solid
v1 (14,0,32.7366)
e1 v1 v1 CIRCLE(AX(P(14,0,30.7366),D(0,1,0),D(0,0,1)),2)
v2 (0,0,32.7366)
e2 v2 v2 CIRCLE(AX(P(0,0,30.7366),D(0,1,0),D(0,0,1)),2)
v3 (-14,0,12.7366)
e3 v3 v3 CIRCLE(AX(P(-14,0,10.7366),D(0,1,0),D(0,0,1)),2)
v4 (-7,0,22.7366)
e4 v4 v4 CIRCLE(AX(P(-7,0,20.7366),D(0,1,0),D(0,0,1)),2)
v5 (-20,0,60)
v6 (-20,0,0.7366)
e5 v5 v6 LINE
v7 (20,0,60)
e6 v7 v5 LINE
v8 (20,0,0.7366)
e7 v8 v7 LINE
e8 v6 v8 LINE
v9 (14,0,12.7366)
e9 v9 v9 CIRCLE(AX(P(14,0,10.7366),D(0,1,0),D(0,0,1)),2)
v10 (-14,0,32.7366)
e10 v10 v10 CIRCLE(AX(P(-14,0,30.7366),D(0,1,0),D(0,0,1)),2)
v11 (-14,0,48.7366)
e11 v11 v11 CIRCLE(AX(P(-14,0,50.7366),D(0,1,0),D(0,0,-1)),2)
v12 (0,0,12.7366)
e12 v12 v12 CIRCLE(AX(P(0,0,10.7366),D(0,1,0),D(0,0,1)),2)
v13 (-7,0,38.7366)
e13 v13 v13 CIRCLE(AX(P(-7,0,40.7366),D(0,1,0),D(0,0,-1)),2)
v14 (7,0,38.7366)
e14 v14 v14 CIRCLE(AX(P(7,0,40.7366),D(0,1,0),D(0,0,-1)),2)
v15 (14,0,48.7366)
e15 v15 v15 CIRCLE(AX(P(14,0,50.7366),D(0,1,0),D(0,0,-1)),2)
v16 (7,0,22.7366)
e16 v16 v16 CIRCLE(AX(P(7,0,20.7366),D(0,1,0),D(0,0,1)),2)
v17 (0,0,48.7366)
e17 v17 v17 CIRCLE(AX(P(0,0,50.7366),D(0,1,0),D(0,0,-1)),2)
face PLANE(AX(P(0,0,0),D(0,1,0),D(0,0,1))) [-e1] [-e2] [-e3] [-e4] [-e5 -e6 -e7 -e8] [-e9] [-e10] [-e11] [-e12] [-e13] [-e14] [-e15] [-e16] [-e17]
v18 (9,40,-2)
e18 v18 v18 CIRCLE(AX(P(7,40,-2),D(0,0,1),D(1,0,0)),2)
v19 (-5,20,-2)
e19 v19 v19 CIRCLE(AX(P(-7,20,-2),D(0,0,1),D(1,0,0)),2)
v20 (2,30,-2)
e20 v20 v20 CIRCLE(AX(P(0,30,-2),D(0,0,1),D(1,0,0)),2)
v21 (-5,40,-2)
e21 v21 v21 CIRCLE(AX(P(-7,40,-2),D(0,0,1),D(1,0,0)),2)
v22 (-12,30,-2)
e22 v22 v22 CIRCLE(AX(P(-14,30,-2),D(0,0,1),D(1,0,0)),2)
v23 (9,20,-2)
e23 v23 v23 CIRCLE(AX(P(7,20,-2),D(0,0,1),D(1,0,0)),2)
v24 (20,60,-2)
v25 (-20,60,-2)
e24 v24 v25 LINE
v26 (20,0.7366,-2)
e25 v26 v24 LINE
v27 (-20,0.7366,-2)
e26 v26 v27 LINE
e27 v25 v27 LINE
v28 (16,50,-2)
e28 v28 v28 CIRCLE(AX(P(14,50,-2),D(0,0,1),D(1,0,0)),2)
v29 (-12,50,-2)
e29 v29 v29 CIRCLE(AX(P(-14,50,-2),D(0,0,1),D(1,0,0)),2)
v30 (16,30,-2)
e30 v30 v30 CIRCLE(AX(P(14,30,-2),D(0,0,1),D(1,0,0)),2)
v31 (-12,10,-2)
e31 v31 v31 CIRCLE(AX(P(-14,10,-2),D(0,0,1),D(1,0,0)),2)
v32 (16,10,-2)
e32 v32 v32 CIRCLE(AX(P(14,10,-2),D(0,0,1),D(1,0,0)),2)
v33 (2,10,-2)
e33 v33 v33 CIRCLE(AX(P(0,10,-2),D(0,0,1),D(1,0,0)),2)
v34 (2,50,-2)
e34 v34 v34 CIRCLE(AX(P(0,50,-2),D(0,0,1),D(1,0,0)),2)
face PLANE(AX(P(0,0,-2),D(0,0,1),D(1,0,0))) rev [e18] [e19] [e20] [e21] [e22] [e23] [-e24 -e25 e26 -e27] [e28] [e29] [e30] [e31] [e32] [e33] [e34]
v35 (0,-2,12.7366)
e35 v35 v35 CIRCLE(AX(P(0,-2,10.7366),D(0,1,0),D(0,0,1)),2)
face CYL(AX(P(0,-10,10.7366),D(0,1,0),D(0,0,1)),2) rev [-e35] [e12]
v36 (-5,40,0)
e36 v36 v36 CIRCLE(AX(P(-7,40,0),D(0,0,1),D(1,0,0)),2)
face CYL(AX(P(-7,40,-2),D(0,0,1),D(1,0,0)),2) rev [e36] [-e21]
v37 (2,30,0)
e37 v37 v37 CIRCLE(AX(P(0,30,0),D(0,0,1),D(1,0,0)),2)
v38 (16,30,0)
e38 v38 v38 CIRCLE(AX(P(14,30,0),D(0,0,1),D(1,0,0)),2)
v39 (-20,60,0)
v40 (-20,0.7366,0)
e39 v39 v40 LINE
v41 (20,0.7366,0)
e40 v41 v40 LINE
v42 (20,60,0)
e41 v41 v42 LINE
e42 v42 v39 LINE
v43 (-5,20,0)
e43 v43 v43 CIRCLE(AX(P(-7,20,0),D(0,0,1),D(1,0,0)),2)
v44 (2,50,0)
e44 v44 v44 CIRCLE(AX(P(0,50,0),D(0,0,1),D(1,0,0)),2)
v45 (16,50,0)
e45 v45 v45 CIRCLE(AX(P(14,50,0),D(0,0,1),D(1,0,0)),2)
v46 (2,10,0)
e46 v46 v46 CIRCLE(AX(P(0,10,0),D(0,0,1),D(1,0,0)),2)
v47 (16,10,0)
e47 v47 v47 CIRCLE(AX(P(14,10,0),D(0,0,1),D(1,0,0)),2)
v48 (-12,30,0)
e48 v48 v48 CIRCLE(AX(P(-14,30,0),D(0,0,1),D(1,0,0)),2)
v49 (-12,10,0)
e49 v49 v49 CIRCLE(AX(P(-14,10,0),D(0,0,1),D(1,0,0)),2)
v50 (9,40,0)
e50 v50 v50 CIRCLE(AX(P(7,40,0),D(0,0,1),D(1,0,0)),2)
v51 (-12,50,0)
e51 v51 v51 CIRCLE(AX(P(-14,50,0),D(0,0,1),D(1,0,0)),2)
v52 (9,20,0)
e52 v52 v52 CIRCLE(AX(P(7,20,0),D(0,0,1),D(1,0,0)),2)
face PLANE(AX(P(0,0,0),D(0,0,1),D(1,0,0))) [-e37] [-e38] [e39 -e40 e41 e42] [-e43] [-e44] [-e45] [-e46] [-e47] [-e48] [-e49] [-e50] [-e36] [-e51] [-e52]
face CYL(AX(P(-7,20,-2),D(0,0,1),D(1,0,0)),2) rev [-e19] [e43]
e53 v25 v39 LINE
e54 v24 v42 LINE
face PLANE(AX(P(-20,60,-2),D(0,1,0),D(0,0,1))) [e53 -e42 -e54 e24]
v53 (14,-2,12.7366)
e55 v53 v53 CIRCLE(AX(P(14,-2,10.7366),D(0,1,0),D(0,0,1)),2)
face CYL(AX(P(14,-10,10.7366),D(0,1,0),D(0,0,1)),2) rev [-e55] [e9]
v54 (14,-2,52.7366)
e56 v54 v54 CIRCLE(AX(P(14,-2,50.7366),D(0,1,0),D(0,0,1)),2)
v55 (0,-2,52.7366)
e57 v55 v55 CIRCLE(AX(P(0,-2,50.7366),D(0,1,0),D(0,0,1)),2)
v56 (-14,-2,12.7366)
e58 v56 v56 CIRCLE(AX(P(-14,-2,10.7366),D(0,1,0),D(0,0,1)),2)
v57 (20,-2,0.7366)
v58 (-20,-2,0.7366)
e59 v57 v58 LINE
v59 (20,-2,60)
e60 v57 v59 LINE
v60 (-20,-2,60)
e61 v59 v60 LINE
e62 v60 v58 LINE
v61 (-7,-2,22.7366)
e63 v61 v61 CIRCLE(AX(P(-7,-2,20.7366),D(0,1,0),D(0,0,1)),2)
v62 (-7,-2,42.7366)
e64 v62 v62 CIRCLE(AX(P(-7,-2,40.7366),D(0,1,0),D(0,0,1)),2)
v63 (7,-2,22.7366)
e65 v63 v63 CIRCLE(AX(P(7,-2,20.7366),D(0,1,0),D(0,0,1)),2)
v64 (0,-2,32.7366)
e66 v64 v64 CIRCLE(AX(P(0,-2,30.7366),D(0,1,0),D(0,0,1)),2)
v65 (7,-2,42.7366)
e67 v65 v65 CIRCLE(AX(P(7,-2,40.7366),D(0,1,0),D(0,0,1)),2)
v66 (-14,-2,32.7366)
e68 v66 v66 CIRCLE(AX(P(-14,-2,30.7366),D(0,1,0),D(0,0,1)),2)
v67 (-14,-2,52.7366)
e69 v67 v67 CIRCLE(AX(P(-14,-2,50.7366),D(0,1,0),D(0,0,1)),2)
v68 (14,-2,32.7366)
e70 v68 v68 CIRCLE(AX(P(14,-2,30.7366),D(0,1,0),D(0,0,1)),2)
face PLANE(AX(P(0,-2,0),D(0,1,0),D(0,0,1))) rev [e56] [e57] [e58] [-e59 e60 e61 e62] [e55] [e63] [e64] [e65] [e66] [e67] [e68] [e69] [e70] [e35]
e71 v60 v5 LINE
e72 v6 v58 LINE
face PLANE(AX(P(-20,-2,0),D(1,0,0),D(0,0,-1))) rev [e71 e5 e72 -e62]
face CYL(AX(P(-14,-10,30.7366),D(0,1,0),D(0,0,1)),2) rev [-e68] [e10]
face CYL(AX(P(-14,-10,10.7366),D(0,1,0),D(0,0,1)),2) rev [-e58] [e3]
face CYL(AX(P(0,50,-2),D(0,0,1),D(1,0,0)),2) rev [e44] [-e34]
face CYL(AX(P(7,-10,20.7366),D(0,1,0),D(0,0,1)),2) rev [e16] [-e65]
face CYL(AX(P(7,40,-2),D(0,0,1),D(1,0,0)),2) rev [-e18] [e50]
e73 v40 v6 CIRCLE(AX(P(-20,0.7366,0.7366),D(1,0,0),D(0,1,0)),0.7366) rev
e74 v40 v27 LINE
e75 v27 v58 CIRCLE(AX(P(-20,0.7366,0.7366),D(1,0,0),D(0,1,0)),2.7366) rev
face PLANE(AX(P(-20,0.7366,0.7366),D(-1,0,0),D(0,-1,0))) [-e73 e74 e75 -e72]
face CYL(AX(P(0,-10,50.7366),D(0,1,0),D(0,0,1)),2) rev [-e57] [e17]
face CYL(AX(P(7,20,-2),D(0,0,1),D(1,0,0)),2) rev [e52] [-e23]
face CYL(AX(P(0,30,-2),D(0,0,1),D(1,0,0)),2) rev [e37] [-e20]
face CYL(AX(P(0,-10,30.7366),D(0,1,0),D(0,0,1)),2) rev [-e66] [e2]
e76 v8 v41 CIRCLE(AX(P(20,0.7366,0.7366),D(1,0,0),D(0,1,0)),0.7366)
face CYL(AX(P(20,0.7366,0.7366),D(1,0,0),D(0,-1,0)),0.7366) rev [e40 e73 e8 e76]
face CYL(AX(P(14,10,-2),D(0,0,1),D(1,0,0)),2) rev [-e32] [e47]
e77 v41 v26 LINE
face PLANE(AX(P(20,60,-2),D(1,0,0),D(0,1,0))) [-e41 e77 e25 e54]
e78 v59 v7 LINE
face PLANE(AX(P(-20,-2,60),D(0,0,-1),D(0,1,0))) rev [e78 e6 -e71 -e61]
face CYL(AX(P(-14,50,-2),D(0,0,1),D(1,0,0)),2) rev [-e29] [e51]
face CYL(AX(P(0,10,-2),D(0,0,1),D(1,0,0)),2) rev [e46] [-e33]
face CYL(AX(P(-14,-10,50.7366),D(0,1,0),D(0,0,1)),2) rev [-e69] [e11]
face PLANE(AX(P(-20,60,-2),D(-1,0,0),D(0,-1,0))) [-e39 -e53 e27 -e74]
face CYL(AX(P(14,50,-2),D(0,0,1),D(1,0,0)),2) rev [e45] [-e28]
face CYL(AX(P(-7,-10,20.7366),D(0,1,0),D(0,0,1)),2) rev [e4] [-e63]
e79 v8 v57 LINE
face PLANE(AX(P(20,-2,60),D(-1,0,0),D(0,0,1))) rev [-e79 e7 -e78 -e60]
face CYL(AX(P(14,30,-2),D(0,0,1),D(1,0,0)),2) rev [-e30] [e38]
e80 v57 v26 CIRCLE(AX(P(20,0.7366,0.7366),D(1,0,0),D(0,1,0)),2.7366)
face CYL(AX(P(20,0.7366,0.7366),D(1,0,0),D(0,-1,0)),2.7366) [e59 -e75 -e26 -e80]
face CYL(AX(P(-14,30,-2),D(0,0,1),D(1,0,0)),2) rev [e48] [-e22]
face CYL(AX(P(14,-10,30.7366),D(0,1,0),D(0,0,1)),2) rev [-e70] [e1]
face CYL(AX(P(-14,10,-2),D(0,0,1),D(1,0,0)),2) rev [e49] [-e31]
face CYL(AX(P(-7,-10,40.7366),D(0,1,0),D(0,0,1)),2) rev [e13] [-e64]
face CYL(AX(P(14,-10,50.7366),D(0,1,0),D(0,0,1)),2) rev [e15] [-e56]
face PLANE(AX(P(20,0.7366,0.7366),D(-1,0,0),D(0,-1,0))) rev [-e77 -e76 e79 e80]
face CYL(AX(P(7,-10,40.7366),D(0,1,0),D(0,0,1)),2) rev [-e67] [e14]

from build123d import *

# Parameters (mm, degrees)
SKETCH1_W                    = 40
SKETCH1_H                    = 60
SKETCH1_R                    = 2
BASE_FLANGE1_DEPTH           = 2
EDGE_FLANGE1_STRIP_W         = 9.4732
EDGE_FLANGE1_STRIP_H         = 2
EDGE_FLANGE1_STRIP_CUT_DEPTH = 40
EDGE_FLANGE1_DEPTH           = 40
SKETCH7_R                    = 2
CUT_EXTRUDE1_DEPTH           = 10


# Sheet-metal steps are written as plain solids
with BuildPart() as part:
    # Sketch1 → Base-Flange1 (new body)
    with BuildSketch(Plane.XY):
        with Locations((0, 30)):
            Rectangle(SKETCH1_W, SKETCH1_H)
        with Locations((-14, 50)):
            Circle(SKETCH1_R, mode=Mode.SUBTRACT)
        with Locations((0, 50)):
            Circle(SKETCH1_R, mode=Mode.SUBTRACT)
        with Locations((14, 50)):
            Circle(SKETCH1_R, mode=Mode.SUBTRACT)
        with Locations((-7, 40)):
            Circle(SKETCH1_R, mode=Mode.SUBTRACT)
        with Locations((7, 40)):
            Circle(SKETCH1_R, mode=Mode.SUBTRACT)
        with Locations((-14, 30)):
            Circle(SKETCH1_R, mode=Mode.SUBTRACT)
        with Locations((-7, 20)):
            Circle(SKETCH1_R, mode=Mode.SUBTRACT)
        with Locations((7, 20)):
            Circle(SKETCH1_R, mode=Mode.SUBTRACT)
        with Locations((0, 30)):
            Circle(SKETCH1_R, mode=Mode.SUBTRACT)
        with Locations((14, 30)):
            Circle(SKETCH1_R, mode=Mode.SUBTRACT)
        with Locations((-14, 10)):
            Circle(SKETCH1_R, mode=Mode.SUBTRACT)
        with Locations((0, 10)):
            Circle(SKETCH1_R, mode=Mode.SUBTRACT)
        with Locations((14, 10)):
            Circle(SKETCH1_R, mode=Mode.SUBTRACT)
    extrude(amount=-BASE_FLANGE1_DEPTH)

    # Edge-Flange1 strip (across the edge) → Edge-Flange1 strip cut (cut)
    with BuildSketch(Plane.YZ.offset(-20)):
        with Locations((-4, -1)):
            Rectangle(EDGE_FLANGE1_STRIP_W, EDGE_FLANGE1_STRIP_H)
    extrude(amount=EDGE_FLANGE1_STRIP_CUT_DEPTH, mode=Mode.SUBTRACT)

    # Edge-Flange1 section (across the edge) → Edge-Flange1 (add)
    with BuildSketch(Plane.YZ.offset(-20)):
        with BuildLine():
            Line((-2, 0.7366), (-2, 60))
            Line((-2, 60), (0, 60))
            Line((0, 60), (0, 0.7366))
            ThreePointArc((0, 0.7366), (0.215745145, 0.215745145), (0.7366, 0))
            Line((0.7366, 0), (0.7366, -2))
            ThreePointArc((0.7366, -2), (-1.198468417, -1.198468417), (-2, 0.7366))
        make_face()
    extrude(amount=EDGE_FLANGE1_DEPTH)

    # Sketch7 → Cut-Extrude1 (cut)
    with BuildSketch(Plane(origin=(0, 0, 0), x_dir=(1, 0, 0), z_dir=(0, 1, 0))):
        with Locations(Location((-14, -10.7366, 0), (0, 0, 270))):
            Circle(SKETCH7_R)
        with Locations(Location((0, -10.7366, 0), (0, 0, 270))):
            Circle(SKETCH7_R)
        with Locations(Location((14, -10.7366, 0), (0, 0, 270))):
            Circle(SKETCH7_R)
        with Locations(Location((-7, -20.7366, 0), (0, 0, 270))):
            Circle(SKETCH7_R)
        with Locations(Location((7, -20.7366, 0), (0, 0, 270))):
            Circle(SKETCH7_R)
        with Locations(Location((-14, -30.7366, 0), (0, 0, 270))):
            Circle(SKETCH7_R)
        with Locations(Location((0, -30.7366, 0), (0, 0, 270))):
            Circle(SKETCH7_R)
        with Locations(Location((14, -30.7366, 0), (0, 0, 270))):
            Circle(SKETCH7_R)
        with Locations(Location((-7, -40.7366, 0), (0, 0, 270))):
            Circle(SKETCH7_R)
        with Locations(Location((7, -40.7366, 0), (0, 0, 270))):
            Circle(SKETCH7_R)
        with Locations(Location((14, -50.7366, 0), (0, 0, 270))):
            Circle(SKETCH7_R)
        with Locations(Location((0, -50.7366, 0), (0, 0, 270))):
            Circle(SKETCH7_R)
        with Locations(Location((-14, -50.7366, 0), (0, 0, 270))):
            Circle(SKETCH7_R)
    extrude(amount=-CUT_EXTRUDE1_DEPTH, mode=Mode.SUBTRACT)


solid = part.part
